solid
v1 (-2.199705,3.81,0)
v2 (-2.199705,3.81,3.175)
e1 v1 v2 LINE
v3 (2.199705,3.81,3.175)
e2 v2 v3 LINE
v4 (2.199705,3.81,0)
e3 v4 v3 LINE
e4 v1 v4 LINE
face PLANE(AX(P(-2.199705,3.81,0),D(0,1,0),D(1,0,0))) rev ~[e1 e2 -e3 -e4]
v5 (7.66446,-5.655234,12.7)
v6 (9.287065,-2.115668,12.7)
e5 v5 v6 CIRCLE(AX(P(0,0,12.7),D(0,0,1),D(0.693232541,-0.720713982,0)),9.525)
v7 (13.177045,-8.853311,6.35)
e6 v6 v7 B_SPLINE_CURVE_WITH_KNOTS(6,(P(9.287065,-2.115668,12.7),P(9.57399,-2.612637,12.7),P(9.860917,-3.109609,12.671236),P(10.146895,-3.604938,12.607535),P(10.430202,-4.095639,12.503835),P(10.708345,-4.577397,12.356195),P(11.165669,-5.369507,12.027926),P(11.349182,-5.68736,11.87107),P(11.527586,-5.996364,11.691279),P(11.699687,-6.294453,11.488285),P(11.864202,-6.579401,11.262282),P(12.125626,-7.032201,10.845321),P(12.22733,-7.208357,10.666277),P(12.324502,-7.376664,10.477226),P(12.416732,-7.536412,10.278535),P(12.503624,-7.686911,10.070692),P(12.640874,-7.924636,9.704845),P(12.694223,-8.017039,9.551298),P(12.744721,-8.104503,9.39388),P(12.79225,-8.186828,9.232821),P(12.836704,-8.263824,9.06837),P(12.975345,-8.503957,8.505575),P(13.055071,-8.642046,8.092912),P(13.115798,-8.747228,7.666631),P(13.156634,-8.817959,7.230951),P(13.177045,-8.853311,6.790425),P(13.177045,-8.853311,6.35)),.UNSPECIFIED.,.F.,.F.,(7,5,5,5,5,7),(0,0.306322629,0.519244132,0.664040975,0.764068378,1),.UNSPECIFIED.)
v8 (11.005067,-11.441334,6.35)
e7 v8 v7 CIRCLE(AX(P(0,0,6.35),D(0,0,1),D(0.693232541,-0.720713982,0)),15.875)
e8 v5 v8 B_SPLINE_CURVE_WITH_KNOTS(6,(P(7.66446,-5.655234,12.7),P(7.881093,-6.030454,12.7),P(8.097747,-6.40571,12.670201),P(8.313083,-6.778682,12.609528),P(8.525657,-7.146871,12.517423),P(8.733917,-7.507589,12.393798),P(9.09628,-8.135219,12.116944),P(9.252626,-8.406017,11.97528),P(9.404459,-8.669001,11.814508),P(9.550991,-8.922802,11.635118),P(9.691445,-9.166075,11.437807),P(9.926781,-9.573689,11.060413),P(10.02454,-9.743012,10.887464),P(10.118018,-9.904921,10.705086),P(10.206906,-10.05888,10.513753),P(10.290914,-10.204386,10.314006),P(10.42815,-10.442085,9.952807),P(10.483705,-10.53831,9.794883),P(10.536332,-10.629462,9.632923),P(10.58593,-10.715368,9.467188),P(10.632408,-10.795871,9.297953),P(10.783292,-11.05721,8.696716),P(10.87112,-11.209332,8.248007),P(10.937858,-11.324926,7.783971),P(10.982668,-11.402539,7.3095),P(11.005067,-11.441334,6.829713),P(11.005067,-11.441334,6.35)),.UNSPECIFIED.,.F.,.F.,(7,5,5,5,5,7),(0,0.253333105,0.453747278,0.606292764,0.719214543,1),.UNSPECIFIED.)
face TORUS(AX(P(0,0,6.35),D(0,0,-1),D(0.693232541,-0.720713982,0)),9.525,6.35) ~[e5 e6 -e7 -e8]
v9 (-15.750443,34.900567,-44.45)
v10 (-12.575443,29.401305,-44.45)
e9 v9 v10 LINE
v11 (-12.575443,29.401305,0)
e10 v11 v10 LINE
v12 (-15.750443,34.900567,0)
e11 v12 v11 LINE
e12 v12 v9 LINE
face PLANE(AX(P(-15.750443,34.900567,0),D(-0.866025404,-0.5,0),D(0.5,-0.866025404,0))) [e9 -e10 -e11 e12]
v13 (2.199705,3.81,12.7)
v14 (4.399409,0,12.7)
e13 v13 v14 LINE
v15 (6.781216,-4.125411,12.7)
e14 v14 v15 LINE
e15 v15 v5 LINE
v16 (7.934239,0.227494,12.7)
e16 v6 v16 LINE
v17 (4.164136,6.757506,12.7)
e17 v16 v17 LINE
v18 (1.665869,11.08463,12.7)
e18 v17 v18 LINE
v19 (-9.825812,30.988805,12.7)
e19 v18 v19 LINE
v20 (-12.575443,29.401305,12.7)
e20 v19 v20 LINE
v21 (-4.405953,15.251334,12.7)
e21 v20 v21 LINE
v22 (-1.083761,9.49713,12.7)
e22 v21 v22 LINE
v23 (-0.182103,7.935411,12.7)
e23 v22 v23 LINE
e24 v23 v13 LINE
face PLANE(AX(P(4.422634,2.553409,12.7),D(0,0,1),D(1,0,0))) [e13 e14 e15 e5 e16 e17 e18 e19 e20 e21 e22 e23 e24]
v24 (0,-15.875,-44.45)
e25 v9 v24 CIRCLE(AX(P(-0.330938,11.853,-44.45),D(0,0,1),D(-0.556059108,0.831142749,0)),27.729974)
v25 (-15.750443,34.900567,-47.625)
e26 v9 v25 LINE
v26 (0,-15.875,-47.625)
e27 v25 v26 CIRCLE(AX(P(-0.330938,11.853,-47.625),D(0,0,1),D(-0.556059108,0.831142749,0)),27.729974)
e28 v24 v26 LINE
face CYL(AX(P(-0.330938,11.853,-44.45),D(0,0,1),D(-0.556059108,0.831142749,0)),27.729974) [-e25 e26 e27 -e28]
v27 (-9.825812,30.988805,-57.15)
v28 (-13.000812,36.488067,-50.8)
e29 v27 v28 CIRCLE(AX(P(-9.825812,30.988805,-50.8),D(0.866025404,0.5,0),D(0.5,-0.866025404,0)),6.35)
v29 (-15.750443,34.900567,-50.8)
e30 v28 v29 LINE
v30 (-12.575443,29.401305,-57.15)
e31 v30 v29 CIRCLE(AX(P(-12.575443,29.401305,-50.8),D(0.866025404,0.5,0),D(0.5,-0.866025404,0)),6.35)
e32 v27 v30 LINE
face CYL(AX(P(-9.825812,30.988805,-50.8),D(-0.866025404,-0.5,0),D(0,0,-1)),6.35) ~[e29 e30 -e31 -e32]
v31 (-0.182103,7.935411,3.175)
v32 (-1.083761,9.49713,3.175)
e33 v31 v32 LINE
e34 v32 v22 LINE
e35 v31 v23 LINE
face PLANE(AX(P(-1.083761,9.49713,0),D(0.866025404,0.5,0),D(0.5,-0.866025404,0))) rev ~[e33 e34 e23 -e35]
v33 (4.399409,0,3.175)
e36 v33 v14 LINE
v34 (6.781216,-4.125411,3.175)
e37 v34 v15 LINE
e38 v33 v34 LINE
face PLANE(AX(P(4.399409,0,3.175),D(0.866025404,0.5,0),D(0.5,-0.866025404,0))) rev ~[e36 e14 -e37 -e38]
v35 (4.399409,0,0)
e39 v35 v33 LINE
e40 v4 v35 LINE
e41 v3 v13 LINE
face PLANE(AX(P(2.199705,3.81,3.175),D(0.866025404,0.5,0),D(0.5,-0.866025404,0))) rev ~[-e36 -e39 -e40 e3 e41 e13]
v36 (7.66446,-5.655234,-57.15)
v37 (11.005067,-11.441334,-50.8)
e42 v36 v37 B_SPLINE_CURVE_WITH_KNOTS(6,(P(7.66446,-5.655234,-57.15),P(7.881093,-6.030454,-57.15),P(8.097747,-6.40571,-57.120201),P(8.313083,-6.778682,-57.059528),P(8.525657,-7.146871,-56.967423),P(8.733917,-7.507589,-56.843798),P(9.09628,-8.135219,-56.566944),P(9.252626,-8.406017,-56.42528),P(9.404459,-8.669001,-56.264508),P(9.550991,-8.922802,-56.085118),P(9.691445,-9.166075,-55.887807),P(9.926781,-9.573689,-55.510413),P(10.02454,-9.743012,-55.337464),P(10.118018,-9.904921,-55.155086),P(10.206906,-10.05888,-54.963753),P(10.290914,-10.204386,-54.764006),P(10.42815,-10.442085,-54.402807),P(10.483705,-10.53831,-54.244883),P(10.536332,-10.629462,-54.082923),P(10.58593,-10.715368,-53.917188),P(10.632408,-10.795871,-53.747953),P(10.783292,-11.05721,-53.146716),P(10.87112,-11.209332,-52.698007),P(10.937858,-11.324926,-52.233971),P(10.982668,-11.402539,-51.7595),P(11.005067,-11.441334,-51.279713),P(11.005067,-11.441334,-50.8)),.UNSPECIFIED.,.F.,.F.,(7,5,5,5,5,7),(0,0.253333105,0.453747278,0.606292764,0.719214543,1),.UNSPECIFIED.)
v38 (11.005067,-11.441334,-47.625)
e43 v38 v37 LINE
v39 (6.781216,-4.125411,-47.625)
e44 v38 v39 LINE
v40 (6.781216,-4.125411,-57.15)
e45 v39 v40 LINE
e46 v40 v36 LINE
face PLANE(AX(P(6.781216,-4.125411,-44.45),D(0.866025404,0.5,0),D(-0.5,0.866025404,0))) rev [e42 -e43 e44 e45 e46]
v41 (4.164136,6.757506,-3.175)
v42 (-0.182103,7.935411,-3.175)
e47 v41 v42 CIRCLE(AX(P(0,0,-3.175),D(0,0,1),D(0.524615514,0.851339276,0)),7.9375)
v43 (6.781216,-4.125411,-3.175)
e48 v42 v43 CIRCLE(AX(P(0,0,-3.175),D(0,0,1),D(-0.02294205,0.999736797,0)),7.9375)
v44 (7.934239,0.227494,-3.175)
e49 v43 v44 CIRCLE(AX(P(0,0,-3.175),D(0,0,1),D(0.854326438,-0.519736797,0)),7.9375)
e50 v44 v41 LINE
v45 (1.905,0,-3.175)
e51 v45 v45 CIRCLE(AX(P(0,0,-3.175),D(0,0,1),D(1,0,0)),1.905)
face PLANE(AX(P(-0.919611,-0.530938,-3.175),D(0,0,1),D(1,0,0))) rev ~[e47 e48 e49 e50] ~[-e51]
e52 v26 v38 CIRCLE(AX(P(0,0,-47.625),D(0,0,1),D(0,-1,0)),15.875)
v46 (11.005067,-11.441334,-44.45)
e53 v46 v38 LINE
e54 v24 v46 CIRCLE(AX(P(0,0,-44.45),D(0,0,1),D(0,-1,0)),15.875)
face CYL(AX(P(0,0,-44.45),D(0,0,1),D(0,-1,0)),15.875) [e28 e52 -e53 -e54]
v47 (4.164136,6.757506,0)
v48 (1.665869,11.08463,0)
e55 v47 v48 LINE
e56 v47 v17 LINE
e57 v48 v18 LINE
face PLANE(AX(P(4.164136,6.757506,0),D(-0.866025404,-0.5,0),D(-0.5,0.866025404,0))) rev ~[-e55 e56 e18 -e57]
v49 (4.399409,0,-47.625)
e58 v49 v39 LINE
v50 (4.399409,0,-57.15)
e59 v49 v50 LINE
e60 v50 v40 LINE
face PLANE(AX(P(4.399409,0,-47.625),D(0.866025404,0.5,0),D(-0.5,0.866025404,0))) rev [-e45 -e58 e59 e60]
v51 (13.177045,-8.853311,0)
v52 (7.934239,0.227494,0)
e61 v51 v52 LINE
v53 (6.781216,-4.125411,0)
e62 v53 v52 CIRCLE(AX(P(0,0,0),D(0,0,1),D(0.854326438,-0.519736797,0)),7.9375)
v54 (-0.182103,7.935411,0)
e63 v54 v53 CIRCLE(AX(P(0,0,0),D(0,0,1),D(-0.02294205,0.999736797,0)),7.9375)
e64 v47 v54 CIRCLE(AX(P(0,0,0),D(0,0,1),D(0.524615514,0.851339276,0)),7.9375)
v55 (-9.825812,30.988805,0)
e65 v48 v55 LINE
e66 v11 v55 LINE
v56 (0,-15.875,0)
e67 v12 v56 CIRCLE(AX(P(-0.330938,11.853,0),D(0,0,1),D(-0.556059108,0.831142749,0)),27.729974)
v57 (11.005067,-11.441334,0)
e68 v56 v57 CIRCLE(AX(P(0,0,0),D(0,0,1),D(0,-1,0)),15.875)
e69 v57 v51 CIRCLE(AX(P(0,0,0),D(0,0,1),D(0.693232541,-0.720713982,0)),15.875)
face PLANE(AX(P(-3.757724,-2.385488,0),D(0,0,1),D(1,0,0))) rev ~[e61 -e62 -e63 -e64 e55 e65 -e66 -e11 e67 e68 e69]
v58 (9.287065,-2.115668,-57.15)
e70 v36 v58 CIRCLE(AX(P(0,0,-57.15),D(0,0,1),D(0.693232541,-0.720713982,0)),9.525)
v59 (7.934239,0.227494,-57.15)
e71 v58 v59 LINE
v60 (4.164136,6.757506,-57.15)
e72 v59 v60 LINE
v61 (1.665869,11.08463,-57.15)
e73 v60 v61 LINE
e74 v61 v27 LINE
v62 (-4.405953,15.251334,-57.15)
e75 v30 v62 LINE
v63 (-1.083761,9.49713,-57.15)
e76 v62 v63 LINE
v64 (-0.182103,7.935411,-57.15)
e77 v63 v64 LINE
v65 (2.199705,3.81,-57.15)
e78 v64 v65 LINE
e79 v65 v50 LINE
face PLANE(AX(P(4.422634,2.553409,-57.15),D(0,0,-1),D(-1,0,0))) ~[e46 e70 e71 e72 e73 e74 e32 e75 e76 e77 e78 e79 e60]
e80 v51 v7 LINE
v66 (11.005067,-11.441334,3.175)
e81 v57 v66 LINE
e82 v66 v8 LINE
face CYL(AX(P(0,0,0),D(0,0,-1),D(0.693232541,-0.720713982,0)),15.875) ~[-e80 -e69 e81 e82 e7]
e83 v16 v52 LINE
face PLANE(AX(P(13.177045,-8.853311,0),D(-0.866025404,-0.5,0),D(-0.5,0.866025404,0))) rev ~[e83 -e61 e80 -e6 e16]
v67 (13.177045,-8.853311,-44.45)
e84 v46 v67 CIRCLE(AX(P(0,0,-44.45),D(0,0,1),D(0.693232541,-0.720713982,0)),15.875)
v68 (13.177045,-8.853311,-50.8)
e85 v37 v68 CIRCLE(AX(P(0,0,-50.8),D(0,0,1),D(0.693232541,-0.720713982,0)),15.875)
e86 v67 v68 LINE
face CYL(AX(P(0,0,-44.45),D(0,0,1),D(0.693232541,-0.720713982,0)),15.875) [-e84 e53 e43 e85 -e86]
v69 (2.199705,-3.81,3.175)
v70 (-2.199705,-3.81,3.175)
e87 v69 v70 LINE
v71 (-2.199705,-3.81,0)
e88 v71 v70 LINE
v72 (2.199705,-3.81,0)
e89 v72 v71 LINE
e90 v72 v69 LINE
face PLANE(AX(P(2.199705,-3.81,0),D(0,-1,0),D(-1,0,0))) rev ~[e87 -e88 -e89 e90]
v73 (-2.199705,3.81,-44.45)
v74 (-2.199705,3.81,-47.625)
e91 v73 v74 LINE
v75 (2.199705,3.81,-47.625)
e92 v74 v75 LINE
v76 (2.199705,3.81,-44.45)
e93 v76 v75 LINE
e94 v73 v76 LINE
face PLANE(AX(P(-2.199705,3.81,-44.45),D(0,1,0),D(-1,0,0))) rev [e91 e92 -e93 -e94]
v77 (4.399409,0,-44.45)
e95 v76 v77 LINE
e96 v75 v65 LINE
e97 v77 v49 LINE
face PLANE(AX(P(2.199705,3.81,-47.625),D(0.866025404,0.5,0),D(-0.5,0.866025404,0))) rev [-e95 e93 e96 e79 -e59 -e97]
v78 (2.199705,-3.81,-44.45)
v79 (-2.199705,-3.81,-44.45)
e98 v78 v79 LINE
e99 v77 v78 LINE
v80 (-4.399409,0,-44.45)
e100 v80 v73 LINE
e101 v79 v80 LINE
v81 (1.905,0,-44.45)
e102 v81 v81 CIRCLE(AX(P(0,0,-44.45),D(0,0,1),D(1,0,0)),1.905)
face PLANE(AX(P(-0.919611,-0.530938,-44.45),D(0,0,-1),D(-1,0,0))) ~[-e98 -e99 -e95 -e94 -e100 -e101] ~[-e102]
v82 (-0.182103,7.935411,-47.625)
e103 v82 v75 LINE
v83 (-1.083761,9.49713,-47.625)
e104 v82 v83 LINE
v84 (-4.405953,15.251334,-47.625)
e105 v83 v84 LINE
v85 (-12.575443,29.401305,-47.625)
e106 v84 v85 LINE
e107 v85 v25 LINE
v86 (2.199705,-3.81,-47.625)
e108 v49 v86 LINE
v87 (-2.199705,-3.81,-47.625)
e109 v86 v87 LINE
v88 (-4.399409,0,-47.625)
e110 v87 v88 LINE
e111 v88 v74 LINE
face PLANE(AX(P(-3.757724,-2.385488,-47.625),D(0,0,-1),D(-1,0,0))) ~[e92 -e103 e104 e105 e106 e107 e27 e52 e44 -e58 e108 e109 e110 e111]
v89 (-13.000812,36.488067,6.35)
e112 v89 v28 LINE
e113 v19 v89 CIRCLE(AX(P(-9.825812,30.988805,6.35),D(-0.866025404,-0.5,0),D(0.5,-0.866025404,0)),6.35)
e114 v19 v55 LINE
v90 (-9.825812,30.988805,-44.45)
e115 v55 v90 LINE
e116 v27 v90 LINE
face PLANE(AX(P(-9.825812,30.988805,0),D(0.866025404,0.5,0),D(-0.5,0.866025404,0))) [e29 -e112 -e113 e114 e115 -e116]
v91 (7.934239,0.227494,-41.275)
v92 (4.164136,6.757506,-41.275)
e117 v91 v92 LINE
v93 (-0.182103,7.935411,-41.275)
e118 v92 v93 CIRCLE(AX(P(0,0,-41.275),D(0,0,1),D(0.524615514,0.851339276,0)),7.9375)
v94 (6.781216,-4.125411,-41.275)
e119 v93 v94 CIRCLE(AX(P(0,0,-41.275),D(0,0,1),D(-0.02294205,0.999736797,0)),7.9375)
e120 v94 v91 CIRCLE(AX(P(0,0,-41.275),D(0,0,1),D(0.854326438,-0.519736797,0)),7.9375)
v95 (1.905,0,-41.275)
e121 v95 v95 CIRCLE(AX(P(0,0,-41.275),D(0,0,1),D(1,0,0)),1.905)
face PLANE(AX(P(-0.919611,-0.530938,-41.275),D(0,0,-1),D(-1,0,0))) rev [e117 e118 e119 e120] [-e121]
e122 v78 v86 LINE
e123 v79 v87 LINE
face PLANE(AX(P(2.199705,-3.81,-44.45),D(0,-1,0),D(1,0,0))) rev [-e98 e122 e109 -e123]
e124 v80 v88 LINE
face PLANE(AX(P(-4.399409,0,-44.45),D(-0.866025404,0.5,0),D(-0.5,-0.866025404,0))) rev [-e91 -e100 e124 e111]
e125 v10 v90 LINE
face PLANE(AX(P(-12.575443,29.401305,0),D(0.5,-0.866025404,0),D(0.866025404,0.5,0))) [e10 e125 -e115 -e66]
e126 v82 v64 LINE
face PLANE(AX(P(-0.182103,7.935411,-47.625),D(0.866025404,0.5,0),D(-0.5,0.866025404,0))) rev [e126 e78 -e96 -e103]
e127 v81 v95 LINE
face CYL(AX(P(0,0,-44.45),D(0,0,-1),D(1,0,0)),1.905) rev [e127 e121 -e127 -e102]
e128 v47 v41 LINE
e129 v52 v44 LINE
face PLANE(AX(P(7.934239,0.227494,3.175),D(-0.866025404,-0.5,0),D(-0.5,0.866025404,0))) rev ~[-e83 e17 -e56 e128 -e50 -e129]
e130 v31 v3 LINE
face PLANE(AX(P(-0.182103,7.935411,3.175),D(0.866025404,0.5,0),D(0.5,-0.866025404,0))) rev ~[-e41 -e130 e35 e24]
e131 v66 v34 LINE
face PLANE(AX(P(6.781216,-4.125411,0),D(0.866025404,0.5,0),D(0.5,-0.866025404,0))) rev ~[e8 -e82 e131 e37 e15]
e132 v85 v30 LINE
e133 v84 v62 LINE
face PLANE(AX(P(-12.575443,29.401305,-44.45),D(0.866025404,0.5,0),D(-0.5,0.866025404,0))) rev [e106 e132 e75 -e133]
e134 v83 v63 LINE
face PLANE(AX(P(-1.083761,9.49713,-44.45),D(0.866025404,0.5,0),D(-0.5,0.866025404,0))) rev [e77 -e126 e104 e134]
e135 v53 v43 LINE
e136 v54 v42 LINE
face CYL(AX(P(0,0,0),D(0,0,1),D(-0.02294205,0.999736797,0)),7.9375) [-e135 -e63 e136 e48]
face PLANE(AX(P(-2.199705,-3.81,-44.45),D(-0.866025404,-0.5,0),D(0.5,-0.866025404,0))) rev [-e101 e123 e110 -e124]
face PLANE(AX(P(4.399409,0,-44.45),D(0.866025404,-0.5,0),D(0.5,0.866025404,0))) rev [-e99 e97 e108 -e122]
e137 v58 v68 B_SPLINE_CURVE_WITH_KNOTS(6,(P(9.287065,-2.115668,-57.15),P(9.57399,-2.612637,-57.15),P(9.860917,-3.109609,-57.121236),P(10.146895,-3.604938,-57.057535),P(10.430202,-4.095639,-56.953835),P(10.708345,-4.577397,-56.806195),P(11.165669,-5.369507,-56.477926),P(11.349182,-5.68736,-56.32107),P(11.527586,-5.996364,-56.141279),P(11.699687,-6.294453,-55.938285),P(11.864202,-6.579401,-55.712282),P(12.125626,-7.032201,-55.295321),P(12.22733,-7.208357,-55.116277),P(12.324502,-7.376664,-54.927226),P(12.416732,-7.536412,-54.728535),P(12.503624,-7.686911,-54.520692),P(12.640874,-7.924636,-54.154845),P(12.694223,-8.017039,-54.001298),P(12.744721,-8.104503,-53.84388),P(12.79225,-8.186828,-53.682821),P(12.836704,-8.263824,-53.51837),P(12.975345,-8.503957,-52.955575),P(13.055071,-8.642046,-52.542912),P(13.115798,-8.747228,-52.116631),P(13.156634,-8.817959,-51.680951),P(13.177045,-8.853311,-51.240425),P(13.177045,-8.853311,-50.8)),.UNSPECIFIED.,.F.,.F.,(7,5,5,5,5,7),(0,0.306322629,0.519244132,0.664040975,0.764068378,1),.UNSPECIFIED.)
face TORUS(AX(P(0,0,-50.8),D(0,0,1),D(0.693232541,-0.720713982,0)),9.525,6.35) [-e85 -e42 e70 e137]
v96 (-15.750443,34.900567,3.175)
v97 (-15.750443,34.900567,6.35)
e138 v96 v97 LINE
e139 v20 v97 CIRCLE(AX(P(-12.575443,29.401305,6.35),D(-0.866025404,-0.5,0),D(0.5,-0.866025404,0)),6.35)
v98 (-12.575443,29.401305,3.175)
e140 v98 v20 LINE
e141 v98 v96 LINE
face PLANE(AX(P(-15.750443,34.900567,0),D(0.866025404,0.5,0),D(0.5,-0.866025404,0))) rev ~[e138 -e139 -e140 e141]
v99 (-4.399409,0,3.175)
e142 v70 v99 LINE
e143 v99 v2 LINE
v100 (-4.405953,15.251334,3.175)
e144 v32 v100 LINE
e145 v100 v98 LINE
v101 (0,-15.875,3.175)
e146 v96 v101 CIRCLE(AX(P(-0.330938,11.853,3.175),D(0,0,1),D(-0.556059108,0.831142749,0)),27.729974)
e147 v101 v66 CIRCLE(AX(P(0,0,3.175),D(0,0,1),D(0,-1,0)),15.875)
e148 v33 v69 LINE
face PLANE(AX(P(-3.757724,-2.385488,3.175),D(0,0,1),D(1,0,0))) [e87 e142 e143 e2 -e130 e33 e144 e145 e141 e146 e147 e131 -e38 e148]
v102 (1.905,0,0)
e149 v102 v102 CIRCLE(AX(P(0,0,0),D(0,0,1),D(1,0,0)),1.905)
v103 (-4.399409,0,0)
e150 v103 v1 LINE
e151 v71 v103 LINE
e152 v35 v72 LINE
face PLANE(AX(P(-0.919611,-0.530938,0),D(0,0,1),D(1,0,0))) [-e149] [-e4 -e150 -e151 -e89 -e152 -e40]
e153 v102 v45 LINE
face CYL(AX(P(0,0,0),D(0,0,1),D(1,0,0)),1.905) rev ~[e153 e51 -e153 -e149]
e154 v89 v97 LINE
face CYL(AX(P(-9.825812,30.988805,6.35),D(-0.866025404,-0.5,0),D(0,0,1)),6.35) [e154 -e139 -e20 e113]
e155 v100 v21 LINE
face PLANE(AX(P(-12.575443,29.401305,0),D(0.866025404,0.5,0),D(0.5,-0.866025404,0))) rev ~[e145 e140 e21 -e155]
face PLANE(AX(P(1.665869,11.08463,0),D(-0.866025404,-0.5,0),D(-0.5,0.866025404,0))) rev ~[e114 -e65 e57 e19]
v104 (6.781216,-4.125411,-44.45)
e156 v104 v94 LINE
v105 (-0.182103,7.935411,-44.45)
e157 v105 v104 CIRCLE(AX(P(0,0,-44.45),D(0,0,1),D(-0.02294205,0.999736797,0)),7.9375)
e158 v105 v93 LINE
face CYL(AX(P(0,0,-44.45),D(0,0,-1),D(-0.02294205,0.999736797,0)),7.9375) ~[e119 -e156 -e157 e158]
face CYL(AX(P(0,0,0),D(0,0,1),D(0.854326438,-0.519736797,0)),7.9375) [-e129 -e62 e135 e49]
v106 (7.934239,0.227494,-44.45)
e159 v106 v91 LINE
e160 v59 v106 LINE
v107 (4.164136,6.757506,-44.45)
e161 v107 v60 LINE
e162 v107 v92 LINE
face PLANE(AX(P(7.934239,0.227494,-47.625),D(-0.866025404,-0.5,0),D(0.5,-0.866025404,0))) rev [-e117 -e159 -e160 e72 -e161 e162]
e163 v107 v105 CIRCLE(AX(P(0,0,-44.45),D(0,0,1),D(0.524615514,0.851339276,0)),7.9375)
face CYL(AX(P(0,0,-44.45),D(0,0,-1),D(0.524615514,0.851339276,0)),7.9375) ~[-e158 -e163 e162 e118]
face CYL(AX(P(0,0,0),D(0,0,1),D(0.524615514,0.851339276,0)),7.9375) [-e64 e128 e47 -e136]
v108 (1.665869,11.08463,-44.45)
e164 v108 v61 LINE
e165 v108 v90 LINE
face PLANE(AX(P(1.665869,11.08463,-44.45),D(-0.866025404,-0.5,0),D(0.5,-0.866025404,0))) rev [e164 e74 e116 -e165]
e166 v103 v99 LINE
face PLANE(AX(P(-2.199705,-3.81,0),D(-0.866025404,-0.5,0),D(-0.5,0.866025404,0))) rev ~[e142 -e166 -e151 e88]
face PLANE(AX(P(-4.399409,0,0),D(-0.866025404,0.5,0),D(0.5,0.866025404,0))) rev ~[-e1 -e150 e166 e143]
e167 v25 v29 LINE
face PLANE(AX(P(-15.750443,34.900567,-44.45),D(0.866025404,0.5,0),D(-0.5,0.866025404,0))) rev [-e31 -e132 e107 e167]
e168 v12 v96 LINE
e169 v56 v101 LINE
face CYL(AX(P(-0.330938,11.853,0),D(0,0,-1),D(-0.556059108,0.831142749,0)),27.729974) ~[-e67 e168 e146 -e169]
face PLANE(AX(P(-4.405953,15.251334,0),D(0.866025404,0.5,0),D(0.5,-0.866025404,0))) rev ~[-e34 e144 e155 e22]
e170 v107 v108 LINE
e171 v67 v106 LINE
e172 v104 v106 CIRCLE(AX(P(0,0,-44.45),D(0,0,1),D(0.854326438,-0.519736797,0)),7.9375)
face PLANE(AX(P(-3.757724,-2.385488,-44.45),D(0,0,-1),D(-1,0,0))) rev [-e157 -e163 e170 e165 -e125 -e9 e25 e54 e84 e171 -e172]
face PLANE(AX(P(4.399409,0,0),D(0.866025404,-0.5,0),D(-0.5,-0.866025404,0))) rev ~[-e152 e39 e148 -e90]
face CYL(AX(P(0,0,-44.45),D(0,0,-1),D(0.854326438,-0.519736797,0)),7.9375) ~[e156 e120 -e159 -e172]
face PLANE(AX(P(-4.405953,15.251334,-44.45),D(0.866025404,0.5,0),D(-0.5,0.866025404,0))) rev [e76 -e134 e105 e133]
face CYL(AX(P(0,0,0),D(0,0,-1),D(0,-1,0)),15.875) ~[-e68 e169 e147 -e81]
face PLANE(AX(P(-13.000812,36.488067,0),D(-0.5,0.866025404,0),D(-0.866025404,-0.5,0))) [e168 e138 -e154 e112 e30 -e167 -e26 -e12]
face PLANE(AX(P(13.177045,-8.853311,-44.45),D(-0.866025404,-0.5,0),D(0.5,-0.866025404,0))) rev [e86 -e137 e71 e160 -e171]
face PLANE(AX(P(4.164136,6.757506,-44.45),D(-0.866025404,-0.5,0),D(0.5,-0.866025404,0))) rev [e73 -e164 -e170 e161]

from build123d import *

# Parameters (mm, degrees)
F0_R     = 1.905
F1_DEPTH = 3.175
F2_DEPTH = 3.175
F3_DEPTH = 12.7
F5_DEPTH = 9.525
F6_R     = 6.35
F9_DEPTH = 44.45


with BuildPart() as f1:
    # F0 (on Top) → F1 (new body)
    with BuildSketch(Plane.XY):
        with BuildLine():
            Line((2.1997045256, 3.81), (-0.1821025232, 7.9354108224))
            ThreePointArc((-0.1821025232, 7.9354108224), (-6.8740766425, -3.96875), (6.7812161001, -4.1254108224))
            Line((6.7812161001, -4.1254108224), (4.3994090512, 0))
            Line((4.3994090512, 0), (2.1997045256, -3.81))
            Line((2.1997045256, -3.81), (-2.1997045256, -3.81))
            Line((-2.1997045256, -3.81), (-4.3994090512, 0))
            Line((-4.3994090512, 0), (-2.1997045256, 3.81))
            Line((-2.1997045256, 3.81), (2.1997045256, 3.81))
        make_face()
        with BuildLine():
            ThreePointArc((4.1641356391, 6.7575055034), (2.0762977072, 7.6611287733), (-0.1821025232, 7.9354108224))
            Line((-0.1821025232, 7.9354108224), (2.1997045256, 3.81))
            Line((2.1997045256, 3.81), (4.3994090512, 0))
            Line((4.3994090512, 0), (6.7812161001, -4.1254108224))
            ThreePointArc((6.7812161001, -4.1254108224), (7.672880993, -2.0324378264), (7.9342392518, 0.2274944966))
            Line((7.9342392518, 0.2274944966), (4.1641356391, 6.7575055034))
        make_face()
        Polygon((4.3994090512, 0), (2.1997045256, 3.81), (-2.1997045256, 3.81), (-4.3994090512, 0), (-2.1997045256, -3.81), (2.1997045256, -3.81), align=None)
        Circle(F0_R, mode=Mode.SUBTRACT)
    extrude(amount=-F1_DEPTH)

    # F0 (on Top) → F2 (join)
    with BuildSketch(Plane.XY):
        with BuildLine():
            Line((-1.0837612628, 9.4971295705), (-4.4059530098, 15.2513344687))
            ThreePointArc((-4.4059530098, 15.2513344687), (-15.7183103368, -2.2249371126), (0, -15.875))
            ThreePointArc((0, -15.875), (5.9323031071, -14.7249246125), (11.0050665866, -11.4413344687))
            Line((11.0050665866, -11.4413344687), (6.7812161001, -4.1254108224))
            ThreePointArc((6.7812161001, -4.1254108224), (-6.8740766425, -3.96875), (-0.1821025232, 7.9354108224))
            Line((-0.1821025232, 7.9354108224), (-1.0837612628, 9.4971295705))
        make_face()
        Polygon((-12.5754425904, 29.4013054943), (-4.4059530098, 15.2513344687), (-1.0837612628, 9.4971295705), (1.6658693942, 11.0846295705), (-9.8258119334, 30.9888054943), align=None)
        with BuildLine():
            ThreePointArc((0, -15.875), (-15.7183103368, -2.2249371126), (-4.4059530098, 15.2513344687))
            Line((-4.4059530098, 15.2513344687), (-12.5754425904, 29.4013054943))
            Line((-12.5754425904, 29.4013054943), (-15.7504425904, 34.9005668084))
            ThreePointArc((-15.7504425904, 34.9005668084), (-26.8159478457, 3.6374215932), (0, -15.875))
        make_face()
        with BuildLine():
            Line((1.6658693942, 11.0846295705), (-1.0837612628, 9.4971295705))
            Line((-1.0837612628, 9.4971295705), (-0.1821025232, 7.9354108224))
            ThreePointArc((-0.1821025232, 7.9354108224), (2.0762977072, 7.6611287733), (4.1641356391, 6.7575055034))
            Line((4.1641356391, 6.7575055034), (1.6658693942, 11.0846295705))
        make_face()
        Polygon((-15.7504425904, 34.9005668084), (-12.5754425904, 29.4013054943), (-9.8258119334, 30.9888054943), (-13.0008119334, 36.4880668084), align=None)
        with BuildLine():
            Line((6.7812161001, -4.1254108224), (11.0050665866, -11.4413344687))
            ThreePointArc((11.0050665866, -11.4413344687), (12.1601025371, -10.2052697803), (13.1770447672, -8.8533110305))
            Line((13.1770447672, -8.8533110305), (7.9342392518, 0.2274944966))
            ThreePointArc((7.9342392518, 0.2274944966), (7.672880993, -2.0324378264), (6.7812161001, -4.1254108224))
        make_face()
        with BuildLine():
            ThreePointArc((4.1641356391, 6.7575055034), (2.0762977072, 7.6611287733), (-0.1821025232, 7.9354108224))
            Line((-0.1821025232, 7.9354108224), (2.1997045256, 3.81))
            Line((2.1997045256, 3.81), (4.3994090512, 0))
            Line((4.3994090512, 0), (6.7812161001, -4.1254108224))
            ThreePointArc((6.7812161001, -4.1254108224), (7.672880993, -2.0324378264), (7.9342392518, 0.2274944966))
            Line((7.9342392518, 0.2274944966), (4.1641356391, 6.7575055034))
        make_face()
        with BuildLine():
            Line((2.1997045256, 3.81), (-0.1821025232, 7.9354108224))
            ThreePointArc((-0.1821025232, 7.9354108224), (-6.8740766425, -3.96875), (6.7812161001, -4.1254108224))
            Line((6.7812161001, -4.1254108224), (4.3994090512, 0))
            Line((4.3994090512, 0), (2.1997045256, -3.81))
            Line((2.1997045256, -3.81), (-2.1997045256, -3.81))
            Line((-2.1997045256, -3.81), (-4.3994090512, 0))
            Line((-4.3994090512, 0), (-2.1997045256, 3.81))
            Line((-2.1997045256, 3.81), (2.1997045256, 3.81))
        make_face()
    extrude(amount=F2_DEPTH)

    # F0 (on Top) → F3 (join)
    with BuildSketch(Plane.XY):
        with BuildLine():
            Line((6.7812161001, -4.1254108224), (11.0050665866, -11.4413344687))
            ThreePointArc((11.0050665866, -11.4413344687), (12.1601025371, -10.2052697803), (13.1770447672, -8.8533110305))
            Line((13.1770447672, -8.8533110305), (7.9342392518, 0.2274944966))
            ThreePointArc((7.9342392518, 0.2274944966), (7.672880993, -2.0324378264), (6.7812161001, -4.1254108224))
        make_face()
        with BuildLine():
            Line((1.6658693942, 11.0846295705), (-1.0837612628, 9.4971295705))
            Line((-1.0837612628, 9.4971295705), (-0.1821025232, 7.9354108224))
            ThreePointArc((-0.1821025232, 7.9354108224), (2.0762977072, 7.6611287733), (4.1641356391, 6.7575055034))
            Line((4.1641356391, 6.7575055034), (1.6658693942, 11.0846295705))
        make_face()
        Polygon((-12.5754425904, 29.4013054943), (-4.4059530098, 15.2513344687), (-1.0837612628, 9.4971295705), (1.6658693942, 11.0846295705), (-9.8258119334, 30.9888054943), align=None)
        Polygon((-15.7504425904, 34.9005668084), (-12.5754425904, 29.4013054943), (-9.8258119334, 30.9888054943), (-13.0008119334, 36.4880668084), align=None)
    extrude(amount=F3_DEPTH)

    # F4 (on face) → F5 (join)
    with BuildSketch(Plane.XY.offset(3.175)):
        with BuildLine():
            Line((4.3994090512, 0), (6.7812161001, -4.1254108224))
            ThreePointArc((6.7812161001, -4.1254108224), (7.672880993, -2.0324378264), (7.9342392518, 0.2274944966))
            Line((7.9342392518, 0.2274944966), (4.1641356391, 6.7575055034))
            ThreePointArc((4.1641356391, 6.7575055034), (2.0762977072, 7.6611287733), (-0.1821025232, 7.9354108224))
            Line((-0.1821025232, 7.9354108224), (2.1997045256, 3.81))
            Line((2.1997045256, 3.81), (4.3994090512, 0))
        make_face()
    extrude(amount=F5_DEPTH)

    # F6
    f6_edges = [f1.edges().sort_by_distance(p)[0] for p in [
        (-14.375627, 35.694317, 12.7),
        (12.160103, -10.20527, 12.7),
    ]]
    fillet(f6_edges, radius=F6_R)


with BuildPart() as f8_1:
    # F8: instance of F1
    add(f1.part.mirror(Plane(origin=(-0.1702882742, -0.0983159809, -22.225), x_dir=(1, 0, 0), z_dir=(0, 0, -1))))


with BuildPart() as f1_1:
    add(f1.part)

    add(f8_1.part)  # F9 merges F8_1
    # F0 (on Top) → F9 (join, through all)
    with BuildSketch(Plane.XY):
        Polygon((-15.7504425904, 34.9005668084), (-12.5754425904, 29.4013054943), (-9.8258119334, 30.9888054943), (-13.0008119334, 36.4880668084), align=None)
    extrude(amount=-F9_DEPTH)


solid = f1_1.part
